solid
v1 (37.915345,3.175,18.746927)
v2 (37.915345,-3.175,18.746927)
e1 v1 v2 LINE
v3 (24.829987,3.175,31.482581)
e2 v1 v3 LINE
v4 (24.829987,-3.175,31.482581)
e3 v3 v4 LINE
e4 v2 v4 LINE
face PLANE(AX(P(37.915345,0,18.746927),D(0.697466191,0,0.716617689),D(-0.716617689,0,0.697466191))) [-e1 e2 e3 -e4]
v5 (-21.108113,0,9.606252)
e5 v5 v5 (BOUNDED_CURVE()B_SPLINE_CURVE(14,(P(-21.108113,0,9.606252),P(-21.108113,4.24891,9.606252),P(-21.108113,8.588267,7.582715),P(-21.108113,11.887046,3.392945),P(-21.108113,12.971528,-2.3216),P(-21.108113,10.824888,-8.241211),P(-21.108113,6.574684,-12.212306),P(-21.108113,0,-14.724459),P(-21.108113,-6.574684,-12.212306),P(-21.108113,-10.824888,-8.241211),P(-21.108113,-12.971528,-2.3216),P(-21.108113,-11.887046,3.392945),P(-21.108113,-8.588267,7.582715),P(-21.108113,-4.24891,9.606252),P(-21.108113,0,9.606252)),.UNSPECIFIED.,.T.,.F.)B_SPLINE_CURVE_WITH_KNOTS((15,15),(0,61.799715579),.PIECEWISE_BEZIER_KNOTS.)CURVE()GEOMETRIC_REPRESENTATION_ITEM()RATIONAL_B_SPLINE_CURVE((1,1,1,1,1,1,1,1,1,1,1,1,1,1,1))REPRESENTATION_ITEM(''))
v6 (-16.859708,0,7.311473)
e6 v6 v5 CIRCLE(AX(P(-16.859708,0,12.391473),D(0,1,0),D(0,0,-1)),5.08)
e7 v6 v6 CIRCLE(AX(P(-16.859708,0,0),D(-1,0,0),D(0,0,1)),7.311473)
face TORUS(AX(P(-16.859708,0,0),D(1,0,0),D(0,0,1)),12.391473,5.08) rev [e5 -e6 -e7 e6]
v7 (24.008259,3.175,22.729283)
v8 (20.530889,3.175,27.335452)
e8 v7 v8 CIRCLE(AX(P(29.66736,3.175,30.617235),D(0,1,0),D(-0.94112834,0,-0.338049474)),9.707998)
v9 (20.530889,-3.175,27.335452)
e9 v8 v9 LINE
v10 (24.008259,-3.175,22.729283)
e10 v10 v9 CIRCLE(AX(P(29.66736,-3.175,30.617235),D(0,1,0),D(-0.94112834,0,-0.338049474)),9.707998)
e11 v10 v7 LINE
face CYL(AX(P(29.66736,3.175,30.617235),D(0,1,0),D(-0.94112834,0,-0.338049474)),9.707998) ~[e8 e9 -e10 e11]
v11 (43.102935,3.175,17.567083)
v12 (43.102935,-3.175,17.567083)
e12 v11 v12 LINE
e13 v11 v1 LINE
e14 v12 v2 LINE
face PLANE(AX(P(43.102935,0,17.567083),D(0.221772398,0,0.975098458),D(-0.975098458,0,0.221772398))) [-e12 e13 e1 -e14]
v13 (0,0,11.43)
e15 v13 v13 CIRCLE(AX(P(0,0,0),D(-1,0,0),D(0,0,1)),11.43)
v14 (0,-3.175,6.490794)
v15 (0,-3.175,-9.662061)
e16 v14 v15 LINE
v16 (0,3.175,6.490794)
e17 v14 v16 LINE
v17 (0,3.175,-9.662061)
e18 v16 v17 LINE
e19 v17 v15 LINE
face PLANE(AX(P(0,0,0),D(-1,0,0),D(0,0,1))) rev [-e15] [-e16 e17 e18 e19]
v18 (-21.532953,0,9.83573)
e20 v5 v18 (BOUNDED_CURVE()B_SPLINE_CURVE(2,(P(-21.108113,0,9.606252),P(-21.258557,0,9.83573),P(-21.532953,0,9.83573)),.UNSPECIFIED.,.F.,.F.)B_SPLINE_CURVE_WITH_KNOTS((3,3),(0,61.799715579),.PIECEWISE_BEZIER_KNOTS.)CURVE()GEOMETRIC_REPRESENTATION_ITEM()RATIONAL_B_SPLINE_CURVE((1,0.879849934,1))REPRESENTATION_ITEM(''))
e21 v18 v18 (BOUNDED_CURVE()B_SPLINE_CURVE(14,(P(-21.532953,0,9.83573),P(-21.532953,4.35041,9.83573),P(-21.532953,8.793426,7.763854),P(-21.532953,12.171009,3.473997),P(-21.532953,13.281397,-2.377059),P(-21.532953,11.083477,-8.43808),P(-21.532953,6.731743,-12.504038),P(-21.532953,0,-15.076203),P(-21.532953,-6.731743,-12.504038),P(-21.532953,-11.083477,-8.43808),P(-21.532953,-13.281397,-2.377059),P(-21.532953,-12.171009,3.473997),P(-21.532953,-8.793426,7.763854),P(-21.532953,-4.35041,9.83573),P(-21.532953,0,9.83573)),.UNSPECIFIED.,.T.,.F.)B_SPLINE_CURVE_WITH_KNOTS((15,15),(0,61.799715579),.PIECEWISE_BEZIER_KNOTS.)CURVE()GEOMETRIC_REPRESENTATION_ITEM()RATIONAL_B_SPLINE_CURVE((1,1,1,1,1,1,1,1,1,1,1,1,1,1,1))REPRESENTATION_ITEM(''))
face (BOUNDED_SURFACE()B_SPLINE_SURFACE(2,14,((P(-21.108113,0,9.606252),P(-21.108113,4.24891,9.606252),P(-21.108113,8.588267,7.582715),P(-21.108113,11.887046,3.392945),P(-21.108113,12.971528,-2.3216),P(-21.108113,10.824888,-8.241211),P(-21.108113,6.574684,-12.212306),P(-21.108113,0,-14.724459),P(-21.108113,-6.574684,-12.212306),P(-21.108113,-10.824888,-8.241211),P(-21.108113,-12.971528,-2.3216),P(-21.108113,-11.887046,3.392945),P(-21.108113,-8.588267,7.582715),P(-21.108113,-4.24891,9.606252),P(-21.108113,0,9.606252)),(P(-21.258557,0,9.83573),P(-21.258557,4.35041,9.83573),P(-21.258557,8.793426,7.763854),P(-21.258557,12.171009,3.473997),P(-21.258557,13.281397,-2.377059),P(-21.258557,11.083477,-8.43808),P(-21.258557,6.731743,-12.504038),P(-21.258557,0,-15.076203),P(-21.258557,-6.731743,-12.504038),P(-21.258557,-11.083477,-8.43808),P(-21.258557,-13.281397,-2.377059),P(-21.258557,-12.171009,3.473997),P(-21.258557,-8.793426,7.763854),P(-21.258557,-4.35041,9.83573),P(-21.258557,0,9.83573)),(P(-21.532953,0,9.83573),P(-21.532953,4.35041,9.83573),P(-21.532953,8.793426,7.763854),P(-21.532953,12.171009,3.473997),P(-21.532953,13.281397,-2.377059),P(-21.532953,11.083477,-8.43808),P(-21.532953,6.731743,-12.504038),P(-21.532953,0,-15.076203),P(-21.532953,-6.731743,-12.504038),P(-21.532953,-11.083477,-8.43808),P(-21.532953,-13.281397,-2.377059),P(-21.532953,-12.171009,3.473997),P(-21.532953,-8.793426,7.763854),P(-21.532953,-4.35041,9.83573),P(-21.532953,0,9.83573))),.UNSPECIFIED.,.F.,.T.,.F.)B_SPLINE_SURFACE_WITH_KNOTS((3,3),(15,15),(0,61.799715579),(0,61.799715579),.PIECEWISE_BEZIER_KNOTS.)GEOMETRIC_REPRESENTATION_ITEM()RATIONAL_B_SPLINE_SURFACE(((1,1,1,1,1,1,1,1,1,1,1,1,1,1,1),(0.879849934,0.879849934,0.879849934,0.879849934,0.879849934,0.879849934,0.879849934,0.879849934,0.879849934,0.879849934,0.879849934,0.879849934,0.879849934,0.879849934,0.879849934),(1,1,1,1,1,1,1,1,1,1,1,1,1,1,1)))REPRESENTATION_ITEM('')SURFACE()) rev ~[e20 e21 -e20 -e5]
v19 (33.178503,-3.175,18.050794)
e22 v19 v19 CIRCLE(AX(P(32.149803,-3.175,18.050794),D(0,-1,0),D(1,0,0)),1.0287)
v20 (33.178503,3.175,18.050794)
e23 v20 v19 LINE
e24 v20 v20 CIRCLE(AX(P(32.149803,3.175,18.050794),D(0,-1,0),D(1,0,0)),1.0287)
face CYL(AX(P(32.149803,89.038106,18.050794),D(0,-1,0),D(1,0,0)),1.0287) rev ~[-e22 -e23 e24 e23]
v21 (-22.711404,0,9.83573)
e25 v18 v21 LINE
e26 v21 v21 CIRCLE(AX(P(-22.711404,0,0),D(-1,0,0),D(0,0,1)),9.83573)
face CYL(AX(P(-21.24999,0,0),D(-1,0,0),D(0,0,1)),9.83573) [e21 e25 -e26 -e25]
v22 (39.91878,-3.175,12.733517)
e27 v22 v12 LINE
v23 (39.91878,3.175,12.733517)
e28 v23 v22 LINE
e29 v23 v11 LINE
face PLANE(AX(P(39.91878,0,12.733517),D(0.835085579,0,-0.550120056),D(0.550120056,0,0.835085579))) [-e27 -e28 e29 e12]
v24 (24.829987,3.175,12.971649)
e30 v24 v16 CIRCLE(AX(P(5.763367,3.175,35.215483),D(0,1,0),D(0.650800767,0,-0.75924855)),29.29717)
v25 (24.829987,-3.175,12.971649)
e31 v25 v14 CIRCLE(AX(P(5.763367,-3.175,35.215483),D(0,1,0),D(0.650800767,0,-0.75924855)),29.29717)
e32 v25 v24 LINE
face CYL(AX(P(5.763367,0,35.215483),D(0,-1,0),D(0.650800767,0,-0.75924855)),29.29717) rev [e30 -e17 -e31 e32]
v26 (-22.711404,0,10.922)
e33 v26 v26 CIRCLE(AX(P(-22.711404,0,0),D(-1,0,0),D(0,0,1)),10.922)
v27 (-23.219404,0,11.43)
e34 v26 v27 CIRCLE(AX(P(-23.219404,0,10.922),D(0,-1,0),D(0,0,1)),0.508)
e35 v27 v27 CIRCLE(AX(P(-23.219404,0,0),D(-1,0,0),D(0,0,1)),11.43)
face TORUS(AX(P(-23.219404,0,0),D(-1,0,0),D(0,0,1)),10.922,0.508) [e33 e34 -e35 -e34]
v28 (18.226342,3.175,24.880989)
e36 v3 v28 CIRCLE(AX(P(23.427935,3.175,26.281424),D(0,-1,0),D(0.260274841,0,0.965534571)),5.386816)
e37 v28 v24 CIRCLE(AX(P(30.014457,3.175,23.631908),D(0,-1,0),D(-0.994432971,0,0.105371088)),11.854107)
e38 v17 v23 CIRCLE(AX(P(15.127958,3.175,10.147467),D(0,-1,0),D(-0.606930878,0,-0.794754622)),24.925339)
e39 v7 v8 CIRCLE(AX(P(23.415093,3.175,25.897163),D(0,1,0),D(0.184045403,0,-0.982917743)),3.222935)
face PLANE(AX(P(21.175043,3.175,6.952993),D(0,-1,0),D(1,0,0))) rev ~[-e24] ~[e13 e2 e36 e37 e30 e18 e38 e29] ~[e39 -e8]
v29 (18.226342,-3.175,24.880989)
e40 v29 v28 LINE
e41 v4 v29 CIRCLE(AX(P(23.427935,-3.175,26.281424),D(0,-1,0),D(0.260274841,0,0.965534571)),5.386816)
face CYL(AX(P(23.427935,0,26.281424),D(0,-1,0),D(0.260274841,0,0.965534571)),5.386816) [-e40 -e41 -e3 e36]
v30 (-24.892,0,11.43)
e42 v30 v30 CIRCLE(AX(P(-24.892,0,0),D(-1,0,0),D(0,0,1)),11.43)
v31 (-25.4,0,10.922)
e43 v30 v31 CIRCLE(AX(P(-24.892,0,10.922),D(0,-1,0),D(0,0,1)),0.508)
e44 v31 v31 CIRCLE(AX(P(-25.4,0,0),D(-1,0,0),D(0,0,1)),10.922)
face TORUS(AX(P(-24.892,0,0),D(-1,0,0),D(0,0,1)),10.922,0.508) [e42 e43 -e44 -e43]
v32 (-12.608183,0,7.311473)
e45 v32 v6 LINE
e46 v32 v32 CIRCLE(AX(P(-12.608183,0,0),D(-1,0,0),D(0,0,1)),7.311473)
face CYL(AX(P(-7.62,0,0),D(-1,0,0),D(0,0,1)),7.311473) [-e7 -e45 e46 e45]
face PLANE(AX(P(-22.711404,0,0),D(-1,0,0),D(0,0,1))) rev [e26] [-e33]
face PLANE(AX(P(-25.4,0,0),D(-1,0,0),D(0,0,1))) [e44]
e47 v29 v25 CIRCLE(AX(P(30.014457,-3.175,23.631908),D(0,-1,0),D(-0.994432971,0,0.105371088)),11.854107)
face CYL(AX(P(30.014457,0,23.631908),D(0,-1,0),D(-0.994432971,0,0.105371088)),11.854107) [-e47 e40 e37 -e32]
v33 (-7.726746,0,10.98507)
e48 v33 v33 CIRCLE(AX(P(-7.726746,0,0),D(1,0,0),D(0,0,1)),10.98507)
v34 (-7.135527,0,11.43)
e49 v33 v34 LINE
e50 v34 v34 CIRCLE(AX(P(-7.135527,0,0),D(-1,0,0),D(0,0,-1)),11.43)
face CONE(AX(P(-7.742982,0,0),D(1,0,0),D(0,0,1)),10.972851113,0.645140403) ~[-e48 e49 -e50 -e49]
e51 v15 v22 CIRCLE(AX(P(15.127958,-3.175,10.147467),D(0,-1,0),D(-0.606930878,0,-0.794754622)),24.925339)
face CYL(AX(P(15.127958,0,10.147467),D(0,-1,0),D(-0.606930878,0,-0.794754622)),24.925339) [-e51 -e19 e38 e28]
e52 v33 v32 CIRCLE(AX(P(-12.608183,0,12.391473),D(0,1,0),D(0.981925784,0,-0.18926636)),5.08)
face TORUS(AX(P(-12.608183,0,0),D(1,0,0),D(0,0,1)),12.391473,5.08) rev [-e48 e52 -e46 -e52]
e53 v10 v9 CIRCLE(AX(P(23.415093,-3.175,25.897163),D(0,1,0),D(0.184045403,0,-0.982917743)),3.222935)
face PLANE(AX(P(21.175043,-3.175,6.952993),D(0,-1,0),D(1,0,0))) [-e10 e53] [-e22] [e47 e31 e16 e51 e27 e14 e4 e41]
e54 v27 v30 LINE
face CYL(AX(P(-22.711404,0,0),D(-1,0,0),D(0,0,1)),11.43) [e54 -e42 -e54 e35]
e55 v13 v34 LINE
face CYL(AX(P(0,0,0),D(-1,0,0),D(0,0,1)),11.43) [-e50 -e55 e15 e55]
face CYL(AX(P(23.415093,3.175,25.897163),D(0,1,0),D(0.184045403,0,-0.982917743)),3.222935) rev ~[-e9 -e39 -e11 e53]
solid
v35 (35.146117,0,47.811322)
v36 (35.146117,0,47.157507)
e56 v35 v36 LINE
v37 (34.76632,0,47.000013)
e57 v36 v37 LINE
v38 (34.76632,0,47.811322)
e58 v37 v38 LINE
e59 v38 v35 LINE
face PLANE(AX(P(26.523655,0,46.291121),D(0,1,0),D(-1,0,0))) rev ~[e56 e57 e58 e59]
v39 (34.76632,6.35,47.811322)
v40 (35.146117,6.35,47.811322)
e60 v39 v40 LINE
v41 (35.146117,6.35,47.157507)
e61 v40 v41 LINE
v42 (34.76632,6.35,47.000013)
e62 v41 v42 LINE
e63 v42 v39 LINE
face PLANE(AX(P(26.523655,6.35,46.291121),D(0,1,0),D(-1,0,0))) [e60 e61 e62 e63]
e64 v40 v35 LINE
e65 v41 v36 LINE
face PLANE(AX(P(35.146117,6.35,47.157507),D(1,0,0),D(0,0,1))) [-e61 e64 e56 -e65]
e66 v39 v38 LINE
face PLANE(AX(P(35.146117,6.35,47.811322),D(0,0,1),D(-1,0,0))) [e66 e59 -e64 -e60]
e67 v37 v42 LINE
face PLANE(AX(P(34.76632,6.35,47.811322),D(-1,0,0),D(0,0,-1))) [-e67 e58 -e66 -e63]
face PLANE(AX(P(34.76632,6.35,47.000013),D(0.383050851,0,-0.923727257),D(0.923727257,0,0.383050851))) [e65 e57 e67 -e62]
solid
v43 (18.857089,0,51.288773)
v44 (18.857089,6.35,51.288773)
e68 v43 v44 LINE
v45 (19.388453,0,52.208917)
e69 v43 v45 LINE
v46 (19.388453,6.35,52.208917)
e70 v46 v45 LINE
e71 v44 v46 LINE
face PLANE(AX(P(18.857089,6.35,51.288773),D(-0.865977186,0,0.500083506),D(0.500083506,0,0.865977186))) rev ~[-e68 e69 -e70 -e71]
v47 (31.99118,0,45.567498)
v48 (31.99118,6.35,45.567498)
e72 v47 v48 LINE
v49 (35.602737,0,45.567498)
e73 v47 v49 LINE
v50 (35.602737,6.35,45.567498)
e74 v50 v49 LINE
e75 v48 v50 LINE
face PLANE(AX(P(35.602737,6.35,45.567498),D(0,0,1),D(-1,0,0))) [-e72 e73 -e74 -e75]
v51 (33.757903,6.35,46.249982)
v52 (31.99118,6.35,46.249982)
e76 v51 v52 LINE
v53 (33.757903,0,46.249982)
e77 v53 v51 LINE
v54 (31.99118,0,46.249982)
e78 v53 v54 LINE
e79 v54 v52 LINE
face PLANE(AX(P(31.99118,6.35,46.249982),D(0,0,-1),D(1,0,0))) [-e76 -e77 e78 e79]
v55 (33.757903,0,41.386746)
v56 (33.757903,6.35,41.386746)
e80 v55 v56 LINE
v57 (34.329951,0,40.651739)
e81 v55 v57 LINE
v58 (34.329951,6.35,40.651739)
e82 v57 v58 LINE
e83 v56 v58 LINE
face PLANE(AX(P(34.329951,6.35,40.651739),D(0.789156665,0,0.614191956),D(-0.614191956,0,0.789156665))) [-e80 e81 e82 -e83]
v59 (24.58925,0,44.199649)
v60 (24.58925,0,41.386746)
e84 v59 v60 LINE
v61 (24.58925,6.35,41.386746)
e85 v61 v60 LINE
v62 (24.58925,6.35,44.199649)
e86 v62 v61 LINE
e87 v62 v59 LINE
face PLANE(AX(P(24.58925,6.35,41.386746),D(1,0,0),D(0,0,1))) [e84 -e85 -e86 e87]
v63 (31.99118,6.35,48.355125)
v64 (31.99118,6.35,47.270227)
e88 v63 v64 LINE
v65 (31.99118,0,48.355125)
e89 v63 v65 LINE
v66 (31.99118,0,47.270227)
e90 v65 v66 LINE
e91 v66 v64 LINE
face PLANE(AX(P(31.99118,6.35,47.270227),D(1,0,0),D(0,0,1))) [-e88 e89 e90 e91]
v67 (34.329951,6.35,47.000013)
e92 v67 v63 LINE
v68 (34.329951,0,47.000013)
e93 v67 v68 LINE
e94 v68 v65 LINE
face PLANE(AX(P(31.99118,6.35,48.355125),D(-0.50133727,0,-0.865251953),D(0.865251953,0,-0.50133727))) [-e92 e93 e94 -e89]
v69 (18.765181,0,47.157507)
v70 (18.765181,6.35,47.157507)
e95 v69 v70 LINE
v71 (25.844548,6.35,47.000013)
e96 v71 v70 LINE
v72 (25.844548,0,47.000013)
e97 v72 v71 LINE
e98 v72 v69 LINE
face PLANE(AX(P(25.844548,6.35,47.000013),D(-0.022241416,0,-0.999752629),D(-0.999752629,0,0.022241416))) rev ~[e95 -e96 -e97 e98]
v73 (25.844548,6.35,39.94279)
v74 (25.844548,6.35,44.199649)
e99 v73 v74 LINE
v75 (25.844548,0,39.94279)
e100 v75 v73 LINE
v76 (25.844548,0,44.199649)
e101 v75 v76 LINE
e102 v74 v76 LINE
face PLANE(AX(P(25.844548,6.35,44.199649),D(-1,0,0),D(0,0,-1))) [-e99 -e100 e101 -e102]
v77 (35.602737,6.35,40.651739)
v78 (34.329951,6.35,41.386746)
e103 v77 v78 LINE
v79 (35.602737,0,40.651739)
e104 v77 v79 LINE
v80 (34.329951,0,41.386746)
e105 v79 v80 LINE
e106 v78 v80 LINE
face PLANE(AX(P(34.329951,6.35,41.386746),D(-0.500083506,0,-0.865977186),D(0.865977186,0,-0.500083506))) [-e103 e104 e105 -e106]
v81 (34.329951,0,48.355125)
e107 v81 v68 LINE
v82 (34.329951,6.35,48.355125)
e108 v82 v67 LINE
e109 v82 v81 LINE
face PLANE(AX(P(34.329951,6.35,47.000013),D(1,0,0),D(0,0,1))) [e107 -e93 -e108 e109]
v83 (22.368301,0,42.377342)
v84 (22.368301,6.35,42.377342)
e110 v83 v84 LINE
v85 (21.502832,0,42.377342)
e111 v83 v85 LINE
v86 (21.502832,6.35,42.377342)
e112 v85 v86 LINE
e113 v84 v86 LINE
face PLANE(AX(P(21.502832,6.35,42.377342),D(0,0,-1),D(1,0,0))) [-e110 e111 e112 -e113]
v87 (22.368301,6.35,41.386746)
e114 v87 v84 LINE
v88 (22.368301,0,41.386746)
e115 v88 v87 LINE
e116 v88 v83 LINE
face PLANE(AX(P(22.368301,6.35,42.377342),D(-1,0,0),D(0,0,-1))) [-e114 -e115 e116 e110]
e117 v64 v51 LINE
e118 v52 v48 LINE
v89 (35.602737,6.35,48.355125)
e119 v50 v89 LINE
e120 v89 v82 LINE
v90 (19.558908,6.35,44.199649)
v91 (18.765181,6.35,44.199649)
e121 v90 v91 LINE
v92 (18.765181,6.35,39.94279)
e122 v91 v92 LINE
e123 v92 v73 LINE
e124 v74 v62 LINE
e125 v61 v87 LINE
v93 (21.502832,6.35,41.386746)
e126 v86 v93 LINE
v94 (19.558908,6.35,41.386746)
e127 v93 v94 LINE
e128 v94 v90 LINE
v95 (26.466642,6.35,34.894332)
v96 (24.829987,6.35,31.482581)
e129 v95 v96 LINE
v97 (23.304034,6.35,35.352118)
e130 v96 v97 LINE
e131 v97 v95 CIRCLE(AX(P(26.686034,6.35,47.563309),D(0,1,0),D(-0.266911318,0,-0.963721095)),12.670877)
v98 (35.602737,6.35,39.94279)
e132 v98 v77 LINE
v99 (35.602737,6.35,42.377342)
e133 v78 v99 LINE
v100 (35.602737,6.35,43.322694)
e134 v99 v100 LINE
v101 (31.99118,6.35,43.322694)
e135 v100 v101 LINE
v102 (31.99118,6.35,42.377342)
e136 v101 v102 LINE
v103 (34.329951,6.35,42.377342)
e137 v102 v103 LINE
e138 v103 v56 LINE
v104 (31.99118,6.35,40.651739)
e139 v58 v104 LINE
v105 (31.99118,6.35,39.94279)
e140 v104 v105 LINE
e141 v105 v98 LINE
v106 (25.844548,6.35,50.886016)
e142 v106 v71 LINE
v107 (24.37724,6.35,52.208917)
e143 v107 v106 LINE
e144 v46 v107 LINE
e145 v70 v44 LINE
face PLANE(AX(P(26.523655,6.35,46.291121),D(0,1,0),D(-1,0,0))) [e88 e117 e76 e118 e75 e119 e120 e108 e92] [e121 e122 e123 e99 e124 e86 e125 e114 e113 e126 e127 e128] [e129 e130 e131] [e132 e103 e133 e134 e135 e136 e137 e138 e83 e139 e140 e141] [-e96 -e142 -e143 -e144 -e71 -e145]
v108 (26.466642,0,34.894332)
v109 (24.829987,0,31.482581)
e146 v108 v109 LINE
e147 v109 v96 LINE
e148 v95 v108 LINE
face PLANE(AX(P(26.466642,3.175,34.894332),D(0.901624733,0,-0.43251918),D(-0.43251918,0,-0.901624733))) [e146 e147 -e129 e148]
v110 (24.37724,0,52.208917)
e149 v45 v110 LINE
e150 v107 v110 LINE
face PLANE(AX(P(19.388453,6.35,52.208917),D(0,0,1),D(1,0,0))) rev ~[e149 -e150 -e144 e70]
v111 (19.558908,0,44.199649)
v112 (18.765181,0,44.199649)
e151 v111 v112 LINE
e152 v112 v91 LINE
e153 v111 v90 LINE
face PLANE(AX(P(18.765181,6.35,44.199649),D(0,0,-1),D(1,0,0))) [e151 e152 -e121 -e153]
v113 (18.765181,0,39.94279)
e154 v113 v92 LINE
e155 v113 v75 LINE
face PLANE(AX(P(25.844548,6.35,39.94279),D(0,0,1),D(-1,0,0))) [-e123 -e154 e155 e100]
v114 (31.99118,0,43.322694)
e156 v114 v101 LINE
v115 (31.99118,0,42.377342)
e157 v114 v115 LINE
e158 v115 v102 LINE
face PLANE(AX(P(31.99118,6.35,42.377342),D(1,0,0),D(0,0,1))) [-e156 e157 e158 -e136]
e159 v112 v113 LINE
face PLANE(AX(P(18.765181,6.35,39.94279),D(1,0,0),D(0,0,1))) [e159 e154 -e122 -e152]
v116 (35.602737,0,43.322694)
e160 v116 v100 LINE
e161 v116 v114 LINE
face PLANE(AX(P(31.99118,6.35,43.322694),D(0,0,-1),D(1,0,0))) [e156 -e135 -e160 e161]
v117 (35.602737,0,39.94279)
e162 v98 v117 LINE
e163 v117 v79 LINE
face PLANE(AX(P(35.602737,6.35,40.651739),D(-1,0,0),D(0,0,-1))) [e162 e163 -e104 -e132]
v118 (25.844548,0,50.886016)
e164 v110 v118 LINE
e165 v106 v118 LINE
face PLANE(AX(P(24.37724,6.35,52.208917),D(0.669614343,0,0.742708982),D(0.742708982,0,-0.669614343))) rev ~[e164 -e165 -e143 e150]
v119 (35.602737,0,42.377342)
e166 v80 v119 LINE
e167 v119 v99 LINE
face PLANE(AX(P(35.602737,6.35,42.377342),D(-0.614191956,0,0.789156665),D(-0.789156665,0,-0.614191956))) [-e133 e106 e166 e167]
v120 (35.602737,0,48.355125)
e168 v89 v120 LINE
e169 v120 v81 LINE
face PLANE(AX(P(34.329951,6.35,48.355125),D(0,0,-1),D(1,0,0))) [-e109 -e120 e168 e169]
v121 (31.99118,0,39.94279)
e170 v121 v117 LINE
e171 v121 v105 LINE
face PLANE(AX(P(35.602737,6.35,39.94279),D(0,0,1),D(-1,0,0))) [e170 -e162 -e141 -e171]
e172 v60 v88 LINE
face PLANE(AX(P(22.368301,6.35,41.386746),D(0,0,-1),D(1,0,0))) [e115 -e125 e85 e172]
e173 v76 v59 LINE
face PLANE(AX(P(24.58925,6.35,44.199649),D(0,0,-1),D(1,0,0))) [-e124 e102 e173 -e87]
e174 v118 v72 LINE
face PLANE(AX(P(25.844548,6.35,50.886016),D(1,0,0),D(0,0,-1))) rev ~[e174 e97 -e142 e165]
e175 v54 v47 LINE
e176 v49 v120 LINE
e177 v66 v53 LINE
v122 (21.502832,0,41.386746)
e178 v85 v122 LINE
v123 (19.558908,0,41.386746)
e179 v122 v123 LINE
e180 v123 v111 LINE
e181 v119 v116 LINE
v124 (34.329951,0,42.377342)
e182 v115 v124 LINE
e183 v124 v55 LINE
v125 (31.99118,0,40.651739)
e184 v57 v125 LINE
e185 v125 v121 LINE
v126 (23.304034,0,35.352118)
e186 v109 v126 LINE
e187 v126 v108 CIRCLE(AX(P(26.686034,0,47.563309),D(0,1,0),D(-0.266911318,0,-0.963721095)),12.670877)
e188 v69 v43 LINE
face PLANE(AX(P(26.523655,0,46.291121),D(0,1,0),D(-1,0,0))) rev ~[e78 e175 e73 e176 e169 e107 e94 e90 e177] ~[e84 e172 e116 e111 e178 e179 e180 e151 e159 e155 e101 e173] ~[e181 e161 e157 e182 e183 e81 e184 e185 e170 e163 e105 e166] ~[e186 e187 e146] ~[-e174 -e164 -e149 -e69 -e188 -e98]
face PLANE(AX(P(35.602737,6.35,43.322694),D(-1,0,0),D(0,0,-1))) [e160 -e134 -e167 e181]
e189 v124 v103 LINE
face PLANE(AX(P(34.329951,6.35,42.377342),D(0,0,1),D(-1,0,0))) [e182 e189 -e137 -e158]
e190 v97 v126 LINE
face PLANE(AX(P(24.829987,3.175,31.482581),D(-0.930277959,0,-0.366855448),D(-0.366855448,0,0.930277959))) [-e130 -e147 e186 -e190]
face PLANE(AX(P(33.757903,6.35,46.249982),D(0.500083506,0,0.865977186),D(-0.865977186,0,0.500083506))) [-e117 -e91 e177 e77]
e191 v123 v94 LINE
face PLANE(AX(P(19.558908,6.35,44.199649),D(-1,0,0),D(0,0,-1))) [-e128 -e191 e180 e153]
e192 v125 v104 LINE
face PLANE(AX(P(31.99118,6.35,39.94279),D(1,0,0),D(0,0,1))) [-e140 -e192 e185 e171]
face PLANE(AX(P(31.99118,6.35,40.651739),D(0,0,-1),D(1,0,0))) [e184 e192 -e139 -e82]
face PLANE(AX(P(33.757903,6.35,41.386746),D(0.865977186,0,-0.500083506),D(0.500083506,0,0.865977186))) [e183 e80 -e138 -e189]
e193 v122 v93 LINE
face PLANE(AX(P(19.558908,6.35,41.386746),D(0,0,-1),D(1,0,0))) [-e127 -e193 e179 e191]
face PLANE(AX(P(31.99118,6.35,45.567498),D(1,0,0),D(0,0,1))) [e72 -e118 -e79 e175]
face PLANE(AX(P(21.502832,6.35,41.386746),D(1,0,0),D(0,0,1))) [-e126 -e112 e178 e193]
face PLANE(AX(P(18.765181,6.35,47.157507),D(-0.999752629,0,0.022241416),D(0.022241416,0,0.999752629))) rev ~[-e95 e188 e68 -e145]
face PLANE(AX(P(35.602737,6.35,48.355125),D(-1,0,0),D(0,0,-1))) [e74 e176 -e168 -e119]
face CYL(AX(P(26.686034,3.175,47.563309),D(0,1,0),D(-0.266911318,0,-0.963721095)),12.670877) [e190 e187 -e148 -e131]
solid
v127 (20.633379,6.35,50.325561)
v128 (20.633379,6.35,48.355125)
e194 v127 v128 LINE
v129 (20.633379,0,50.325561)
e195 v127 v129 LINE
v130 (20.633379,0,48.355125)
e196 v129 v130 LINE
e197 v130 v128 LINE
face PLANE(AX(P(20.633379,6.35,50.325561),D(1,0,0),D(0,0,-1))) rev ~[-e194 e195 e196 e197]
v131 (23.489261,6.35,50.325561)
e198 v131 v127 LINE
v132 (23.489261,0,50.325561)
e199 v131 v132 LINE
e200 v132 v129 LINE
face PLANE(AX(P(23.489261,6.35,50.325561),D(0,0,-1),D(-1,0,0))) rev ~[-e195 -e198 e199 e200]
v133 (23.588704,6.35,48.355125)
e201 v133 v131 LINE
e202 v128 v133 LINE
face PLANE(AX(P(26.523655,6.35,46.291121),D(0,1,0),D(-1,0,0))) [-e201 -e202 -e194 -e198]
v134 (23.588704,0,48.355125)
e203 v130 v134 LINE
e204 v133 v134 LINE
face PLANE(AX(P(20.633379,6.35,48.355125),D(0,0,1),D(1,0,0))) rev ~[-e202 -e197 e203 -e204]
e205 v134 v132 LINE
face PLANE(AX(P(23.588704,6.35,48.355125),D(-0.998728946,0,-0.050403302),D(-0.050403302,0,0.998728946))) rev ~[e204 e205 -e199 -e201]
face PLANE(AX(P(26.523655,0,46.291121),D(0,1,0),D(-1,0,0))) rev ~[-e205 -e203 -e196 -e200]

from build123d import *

# Parameters (mm, degrees)
F4_R      = 0.508
F7_DEPTH  = 3.175
F9_D      = 2.0574
F11_DEPTH = 12.7
F13_DEPTH = 3.175
F15_DEPTH = 12.7


# Not quite as in the source:
# - a fillet or chamfer that OpenCascade refuses, or shapes differently, is made with other operations: its cross-section is extruded or revolved along the edge and cut away or added


with BuildPart() as f1:
    # F0 (on Front) → F1 (revolve)
    with BuildSketch(Plane.XZ):
        Polygon((-25.4, 0), (0, 0), (0, 11.43), (-7.62, 11.43), (-7.62, 7.3114731075), (-20.32, 7.3114731075), (-21.2499899719, 9.835730216), (-22.7114037935, 9.835730216), (-22.7114037935, 11.43), (-25.4, 11.43), align=None)
    revolve(axis=Axis((-12.7, 0, 0), (-1, 0, 0)))

    # F2: fillet of radius 5.08 on 1 edges, made by hand

    # F2_s1 → F2_t2 (revolve)
    with BuildSketch(Plane.XZ):
        with BuildLine():
            ThreePointArc((-16.8597077176, 7.3114731075), (-19.3918240371, 7.9875218198), (-21.2499899719, 9.835730216))
            Line((-21.2499899719, 9.835730216), (-20.32, 7.3114731075))
            Line((-20.32, 7.3114731075), (-16.8597077176, 7.3114731075))
        make_face()
    revolve(axis=Axis((-20.32, 0, 0), (-1, 0, 0)))

    # F3: fillet of radius 5.08 on 1 edges, made by hand

    # F3_s1 → F3_t2 (revolve)
    with BuildSketch(Plane.XZ):
        with BuildLine():
            ThreePointArc((-7.62, 11.43), (-9.3738270483, 8.4741600369), (-12.6081829822, 7.3114731075))
            Line((-12.6081829822, 7.3114731075), (-7.62, 7.3114731075))
            Line((-7.62, 7.3114731075), (-7.62, 11.43))
        make_face()
    revolve(axis=Axis((-7.62, 0, 0), (-1, 0, 0)))

    # F4
    f4_edges = [f1.edges().sort_by_distance(p)[0] for p in [
        (-21.24999, 0, -9.83573),
        (-22.711404, 0, -11.43),
        (-25.4, 0, -11.43),
    ]]
    fillet(f4_edges, radius=F4_R)

    # F5: chamfer of 0.508 on 1 edges, made by hand

    # F5_s1 → F5_t2 (revolve, cut)
    with BuildSketch(Plane.XZ):
        with BuildLine():
            Line((-7.7429817287, 10.9728511125), (-7.1192910196, 11.442218632))
            Line((-7.1192910196, 11.442218632), (-7.1192910196, 11.452378632))
            ThreePointArc((-7.1192910196, 11.452378632), (-7.3696455098, 11.44016), (-7.62, 11.44016))
            Line((-7.62, 11.44016), (-7.629976366, 11.4319229462))
            ThreePointArc((-7.629976366, 11.4319229462), (-7.6800748035, 11.2010835053), (-7.7527446032, 10.9756639192))
            Line((-7.7527446032, 10.9756639192), (-7.7429817287, 10.9728511125))
        make_face()
    revolve(axis=Axis((-7.62, 0, 0), (-1, 0, 0)), mode=Mode.SUBTRACT)

    # F6 (on Front) → F7 (join, symmetric)
    with BuildSketch(Plane.XZ):
        with BuildLine():
            Line((0, 6.4907935448), (0, -9.6620609984))
            ThreePointArc((0, -9.6620609984), (27.3235808445, -11.5905018684), (39.9187803268, 12.7335172147))
            Line((39.9187803268, 12.7335172147), (43.1029349566, 17.5670832396))
            Line((43.1029349566, 17.5670832396), (37.9153452814, 18.7469273806))
            Line((37.9153452814, 18.7469273806), (24.8299874365, 31.4825810492))
            ThreePointArc((24.8299874365, 31.4825810492), (19.6194729327, 30.0910701799), (18.2263422757, 24.8809885234))
            ThreePointArc((18.2263422757, 24.8809885234), (19.6474301741, 17.8834645614), (24.8299874365, 12.9716489464))
            ThreePointArc((24.8299874365, 12.9716489464), (13.1623202589, 6.8680022006), (0, 6.4907935448))
        make_face()
    extrude(amount=F7_DEPTH, both=True)

    # F9 (through all)
    with Locations(Plane(origin=(0, 3.175, 0), x_dir=(-1, 0, 0), z_dir=(0, 1, 0))):
        with Locations((-32.1498028934, 18.0507935584)):
            Hole(F9_D / 2)

    # F10 (on face) → F11 (cut, symmetric)
    with BuildSketch(Plane(origin=(0, 3.175, 0), x_dir=(-1, 0, 0), z_dir=(0, 1, 0))):
        with BuildLine():
            ThreePointArc((-20.5308888108, 27.3354519159), (-21.9193644523, 24.7679811752), (-24.0082591772, 22.7292831987))
            ThreePointArc((-24.0082591772, 22.7292831987), (-20.8428543324, 23.9552831131), (-20.5308888108, 27.3354519159))
        make_face()
    extrude(amount=F11_DEPTH, both=True, mode=Mode.SUBTRACT)


with BuildPart() as f13:
    # F12 (on face) → F13 (new body, symmetric)
    with BuildSketch(Plane(origin=(0, 3.175, 0), x_dir=(-1, 0, 0), z_dir=(0, 1, 0))):
        with BuildLine():
            Line((-26.4666415751, 34.8943322897), (-24.8299874365, 31.4825810492))
            Line((-24.8299874365, 31.4825810492), (-23.3040340245, 35.3521183133))
            ThreePointArc((-23.3040340245, 35.3521183133), (-28.5012203621, 60.1034931642), (-26.4666415751, 34.8943322897))
        make_face()
    extrude(amount=F13_DEPTH, both=True)

    # F14 (on face) → F15 (cut, symmetric)
    with BuildSketch(Plane(origin=(0, 6.35, 0), x_dir=(-1, 0, 0), z_dir=(0, 1, 0))):
        Polygon((-35.6027372181, 39.9427898228), (-31.9911800325, 39.9427898228), (-31.9911800325, 40.6517386436), (-34.3299508095, 40.6517386436), (-33.757902766, 41.3867458701), (-34.3299508095, 42.3773415387), (-31.9911800325, 42.3773415387), (-31.9911800325, 43.3226935565), (-35.6027372181, 43.3226935565), (-35.6027372181, 42.3773415387), (-34.3299508095, 41.3867458701), (-35.6027372181, 40.6517386436), align=None)
        Polygon((-35.6027372181, 45.567497611), (-31.9911800325, 45.567497611), (-31.9911800325, 46.2499822183), (-33.757902766, 46.2499822183), (-31.9911800325, 47.2702272236), (-31.9911800325, 48.3551248908), (-34.3299508095, 47.0000132918), (-34.3299508095, 48.3551248908), (-35.6027372181, 48.3551248908), align=None)
        Polygon((-34.7663201392, 47.0000132918), (-35.1461172104, 47.1575073898), (-35.1461172104, 47.8113219142), (-34.7663201392, 47.8113219142), align=None, mode=Mode.SUBTRACT)
        Polygon((-25.8445478976, 44.1996492445), (-25.8445478976, 39.9427898228), (-18.765181303, 39.9427898228), (-18.765181303, 44.1996492445), (-19.5589084178, 44.1996492445), (-19.5589084178, 41.3867458701), (-21.5028319508, 41.3867458701), (-21.5028319508, 42.3773415387), (-22.3683007061, 42.3773415387), (-22.3683007061, 41.3867458701), (-24.5892498642, 41.3867458701), (-24.5892498642, 44.1996492445), align=None)
        Polygon((-25.8445478976, 50.8860163391), (-25.8445478976, 47.0000132918), (-18.765181303, 47.1575073898), (-18.8570892325, 51.2887728417), (-19.388453251, 52.2089174014), (-24.377239868, 52.2089174014), align=None)
        Polygon((-20.6333789974, 48.3551248908), (-23.5887039453, 48.3551248908), (-23.4892610461, 50.3255613148), (-20.6333789974, 50.3255613148), align=None, mode=Mode.SUBTRACT)
    extrude(amount=F15_DEPTH, both=True, mode=Mode.SUBTRACT)


solid = Compound([f1.part, f13.part])
